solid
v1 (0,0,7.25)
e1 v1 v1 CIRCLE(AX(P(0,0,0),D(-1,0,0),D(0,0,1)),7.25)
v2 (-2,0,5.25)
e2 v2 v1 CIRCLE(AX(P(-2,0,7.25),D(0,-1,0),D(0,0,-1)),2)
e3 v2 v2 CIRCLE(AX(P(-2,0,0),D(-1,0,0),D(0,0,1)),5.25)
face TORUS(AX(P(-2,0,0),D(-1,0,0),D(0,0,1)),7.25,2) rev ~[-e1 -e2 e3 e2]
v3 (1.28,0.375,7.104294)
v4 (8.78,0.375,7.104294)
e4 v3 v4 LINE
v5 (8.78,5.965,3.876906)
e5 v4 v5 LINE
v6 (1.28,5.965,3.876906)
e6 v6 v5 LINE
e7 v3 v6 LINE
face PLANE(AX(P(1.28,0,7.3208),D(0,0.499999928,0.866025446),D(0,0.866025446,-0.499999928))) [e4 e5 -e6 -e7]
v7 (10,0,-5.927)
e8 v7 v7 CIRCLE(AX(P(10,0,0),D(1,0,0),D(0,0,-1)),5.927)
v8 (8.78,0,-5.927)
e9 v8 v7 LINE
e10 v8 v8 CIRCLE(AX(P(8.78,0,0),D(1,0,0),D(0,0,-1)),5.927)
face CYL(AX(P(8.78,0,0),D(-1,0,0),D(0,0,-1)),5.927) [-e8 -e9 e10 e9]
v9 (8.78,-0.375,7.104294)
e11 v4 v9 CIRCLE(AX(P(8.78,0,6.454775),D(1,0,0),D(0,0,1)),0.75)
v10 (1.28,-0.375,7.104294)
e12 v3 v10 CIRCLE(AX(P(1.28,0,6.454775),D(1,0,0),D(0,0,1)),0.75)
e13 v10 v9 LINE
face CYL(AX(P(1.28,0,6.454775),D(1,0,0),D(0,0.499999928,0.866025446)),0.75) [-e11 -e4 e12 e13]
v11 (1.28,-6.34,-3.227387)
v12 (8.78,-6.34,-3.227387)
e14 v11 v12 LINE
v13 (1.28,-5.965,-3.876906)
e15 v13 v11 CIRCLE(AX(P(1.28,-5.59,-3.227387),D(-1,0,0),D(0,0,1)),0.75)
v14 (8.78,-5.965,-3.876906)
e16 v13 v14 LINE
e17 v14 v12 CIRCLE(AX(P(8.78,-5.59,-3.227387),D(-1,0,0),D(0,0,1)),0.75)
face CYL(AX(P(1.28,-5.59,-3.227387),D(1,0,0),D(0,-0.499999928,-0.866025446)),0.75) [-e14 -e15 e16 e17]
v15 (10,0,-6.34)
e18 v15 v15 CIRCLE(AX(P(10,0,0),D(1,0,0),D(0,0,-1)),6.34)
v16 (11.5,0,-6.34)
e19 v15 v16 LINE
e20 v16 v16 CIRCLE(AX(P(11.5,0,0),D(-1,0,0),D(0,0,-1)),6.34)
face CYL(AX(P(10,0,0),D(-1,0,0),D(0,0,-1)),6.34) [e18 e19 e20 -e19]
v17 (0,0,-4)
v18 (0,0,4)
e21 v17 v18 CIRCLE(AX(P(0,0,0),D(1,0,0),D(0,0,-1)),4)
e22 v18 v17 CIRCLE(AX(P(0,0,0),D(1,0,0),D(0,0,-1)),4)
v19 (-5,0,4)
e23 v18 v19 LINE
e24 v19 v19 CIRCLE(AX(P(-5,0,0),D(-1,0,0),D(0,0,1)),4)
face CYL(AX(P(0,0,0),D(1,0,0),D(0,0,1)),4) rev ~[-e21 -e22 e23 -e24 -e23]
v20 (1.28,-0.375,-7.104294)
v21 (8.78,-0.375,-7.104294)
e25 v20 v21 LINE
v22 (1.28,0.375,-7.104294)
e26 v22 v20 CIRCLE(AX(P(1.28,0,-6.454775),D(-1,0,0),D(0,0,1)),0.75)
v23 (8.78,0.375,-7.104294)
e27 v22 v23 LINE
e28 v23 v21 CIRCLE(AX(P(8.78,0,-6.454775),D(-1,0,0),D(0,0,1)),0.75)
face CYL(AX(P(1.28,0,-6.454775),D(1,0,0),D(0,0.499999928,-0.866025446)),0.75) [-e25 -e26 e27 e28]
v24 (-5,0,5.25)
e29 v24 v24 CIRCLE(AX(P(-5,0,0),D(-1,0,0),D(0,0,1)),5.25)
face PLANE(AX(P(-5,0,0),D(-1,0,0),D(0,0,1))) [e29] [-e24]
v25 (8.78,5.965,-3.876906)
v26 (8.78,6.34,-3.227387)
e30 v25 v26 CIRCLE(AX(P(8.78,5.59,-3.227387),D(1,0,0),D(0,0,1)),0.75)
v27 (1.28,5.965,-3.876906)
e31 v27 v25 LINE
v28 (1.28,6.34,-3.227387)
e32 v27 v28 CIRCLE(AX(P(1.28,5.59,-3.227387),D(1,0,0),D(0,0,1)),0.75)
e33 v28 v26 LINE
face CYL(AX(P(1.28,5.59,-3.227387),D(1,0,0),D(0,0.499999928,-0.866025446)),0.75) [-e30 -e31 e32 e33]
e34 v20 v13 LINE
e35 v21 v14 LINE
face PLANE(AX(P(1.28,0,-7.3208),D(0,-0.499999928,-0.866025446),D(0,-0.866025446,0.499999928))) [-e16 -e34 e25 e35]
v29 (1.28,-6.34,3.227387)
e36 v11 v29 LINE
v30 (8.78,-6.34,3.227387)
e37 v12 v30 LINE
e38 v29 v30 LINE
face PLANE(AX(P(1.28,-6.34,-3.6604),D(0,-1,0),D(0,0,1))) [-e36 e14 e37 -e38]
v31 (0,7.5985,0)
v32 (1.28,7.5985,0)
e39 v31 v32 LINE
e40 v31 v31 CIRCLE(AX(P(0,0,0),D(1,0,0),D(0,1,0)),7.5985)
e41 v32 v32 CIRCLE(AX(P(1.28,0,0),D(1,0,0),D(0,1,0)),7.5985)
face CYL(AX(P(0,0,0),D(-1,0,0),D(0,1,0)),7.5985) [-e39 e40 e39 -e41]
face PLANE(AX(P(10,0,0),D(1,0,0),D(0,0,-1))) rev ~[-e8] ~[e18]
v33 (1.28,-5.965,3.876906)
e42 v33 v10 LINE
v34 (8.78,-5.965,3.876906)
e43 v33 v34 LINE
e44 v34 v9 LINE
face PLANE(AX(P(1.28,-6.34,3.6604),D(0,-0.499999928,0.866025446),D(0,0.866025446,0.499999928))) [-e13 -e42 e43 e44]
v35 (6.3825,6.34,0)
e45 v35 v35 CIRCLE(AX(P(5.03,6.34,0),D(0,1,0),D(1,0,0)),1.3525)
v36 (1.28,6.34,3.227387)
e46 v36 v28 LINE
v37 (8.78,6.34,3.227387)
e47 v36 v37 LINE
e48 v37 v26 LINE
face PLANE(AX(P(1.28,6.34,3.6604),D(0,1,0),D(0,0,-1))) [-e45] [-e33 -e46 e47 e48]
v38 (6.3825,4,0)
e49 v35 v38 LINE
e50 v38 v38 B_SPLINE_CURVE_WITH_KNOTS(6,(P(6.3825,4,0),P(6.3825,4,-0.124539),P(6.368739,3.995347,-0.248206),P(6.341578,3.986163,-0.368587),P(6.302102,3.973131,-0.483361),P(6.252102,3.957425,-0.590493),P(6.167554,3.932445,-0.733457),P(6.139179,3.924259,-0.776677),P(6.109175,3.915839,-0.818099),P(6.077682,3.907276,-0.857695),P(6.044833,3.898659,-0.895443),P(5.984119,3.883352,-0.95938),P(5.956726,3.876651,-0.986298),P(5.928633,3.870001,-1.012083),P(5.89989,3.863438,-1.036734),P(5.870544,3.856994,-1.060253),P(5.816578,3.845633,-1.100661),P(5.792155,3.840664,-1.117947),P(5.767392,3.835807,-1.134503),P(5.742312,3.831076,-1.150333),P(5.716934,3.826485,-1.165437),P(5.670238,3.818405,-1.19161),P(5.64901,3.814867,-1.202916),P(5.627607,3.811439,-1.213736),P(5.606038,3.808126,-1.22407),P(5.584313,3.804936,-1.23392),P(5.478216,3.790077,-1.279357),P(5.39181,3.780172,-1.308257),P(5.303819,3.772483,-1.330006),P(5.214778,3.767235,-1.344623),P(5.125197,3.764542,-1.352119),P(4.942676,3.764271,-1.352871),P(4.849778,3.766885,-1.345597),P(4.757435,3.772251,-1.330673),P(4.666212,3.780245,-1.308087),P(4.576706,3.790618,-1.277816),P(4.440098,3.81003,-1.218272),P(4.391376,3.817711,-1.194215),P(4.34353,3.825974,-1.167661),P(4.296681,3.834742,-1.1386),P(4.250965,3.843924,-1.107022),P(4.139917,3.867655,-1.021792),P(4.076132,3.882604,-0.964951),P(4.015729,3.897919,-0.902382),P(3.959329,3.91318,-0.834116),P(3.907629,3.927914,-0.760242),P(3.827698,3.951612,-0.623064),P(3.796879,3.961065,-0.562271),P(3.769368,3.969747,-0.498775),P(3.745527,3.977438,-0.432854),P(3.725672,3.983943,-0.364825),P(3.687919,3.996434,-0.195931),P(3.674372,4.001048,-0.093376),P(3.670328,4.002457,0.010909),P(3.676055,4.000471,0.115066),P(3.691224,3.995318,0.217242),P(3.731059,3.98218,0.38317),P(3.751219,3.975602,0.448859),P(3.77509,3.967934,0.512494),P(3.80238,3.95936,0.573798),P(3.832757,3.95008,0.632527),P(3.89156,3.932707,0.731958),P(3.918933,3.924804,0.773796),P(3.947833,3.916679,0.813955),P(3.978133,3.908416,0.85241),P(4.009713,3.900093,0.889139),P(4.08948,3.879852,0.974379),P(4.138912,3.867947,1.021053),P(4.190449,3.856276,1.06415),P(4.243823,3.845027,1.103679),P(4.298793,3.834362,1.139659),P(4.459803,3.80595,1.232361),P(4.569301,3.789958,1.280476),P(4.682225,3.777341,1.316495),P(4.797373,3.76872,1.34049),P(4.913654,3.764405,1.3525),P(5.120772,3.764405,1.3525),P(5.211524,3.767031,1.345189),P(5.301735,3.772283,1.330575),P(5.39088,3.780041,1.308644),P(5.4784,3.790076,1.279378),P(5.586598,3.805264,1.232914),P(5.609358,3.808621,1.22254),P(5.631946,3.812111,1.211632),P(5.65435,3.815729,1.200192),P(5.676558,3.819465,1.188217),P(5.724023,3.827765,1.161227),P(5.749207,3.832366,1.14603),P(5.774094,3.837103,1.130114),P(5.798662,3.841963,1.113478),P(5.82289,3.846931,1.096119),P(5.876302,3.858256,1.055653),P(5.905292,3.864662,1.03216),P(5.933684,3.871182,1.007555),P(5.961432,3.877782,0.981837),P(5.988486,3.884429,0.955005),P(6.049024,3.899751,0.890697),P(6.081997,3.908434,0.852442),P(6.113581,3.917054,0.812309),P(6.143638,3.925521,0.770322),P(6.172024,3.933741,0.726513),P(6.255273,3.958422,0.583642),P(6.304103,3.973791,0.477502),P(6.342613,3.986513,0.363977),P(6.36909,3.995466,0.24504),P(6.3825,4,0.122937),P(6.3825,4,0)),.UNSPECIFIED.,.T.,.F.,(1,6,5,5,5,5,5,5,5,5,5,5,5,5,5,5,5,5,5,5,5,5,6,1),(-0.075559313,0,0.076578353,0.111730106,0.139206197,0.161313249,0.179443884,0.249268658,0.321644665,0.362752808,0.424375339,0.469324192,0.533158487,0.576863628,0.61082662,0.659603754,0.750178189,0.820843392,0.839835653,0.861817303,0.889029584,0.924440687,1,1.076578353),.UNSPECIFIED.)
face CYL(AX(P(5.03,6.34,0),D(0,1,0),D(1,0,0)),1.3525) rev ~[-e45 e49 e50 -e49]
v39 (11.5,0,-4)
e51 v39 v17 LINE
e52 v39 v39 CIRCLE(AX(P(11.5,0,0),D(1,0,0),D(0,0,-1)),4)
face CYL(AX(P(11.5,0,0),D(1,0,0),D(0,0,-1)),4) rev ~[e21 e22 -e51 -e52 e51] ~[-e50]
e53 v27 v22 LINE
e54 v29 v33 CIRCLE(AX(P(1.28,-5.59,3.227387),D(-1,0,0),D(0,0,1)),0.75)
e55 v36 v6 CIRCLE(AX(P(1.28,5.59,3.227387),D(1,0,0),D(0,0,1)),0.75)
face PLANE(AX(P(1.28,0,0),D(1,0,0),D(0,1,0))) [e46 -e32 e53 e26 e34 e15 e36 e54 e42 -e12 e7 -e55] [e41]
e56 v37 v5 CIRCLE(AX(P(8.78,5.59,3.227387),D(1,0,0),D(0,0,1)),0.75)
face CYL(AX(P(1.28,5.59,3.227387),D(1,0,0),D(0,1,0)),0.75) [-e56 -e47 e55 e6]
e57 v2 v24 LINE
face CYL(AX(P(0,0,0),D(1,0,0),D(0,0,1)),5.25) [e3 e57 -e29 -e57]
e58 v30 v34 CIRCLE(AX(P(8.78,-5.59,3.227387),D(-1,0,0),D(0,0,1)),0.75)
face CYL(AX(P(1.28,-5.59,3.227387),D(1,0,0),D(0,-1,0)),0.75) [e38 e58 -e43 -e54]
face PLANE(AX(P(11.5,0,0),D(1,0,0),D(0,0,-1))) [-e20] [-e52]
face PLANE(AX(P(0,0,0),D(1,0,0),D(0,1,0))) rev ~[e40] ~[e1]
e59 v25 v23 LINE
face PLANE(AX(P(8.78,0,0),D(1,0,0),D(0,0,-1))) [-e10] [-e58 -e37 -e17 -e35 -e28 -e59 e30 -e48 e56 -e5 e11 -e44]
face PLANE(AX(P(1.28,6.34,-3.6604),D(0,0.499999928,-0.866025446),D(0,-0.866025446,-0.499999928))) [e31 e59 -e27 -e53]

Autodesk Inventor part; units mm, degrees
ref_plane "YZ Plane" through (0, 0, 0) normal (1, 0, 0) x (0, 1, 0)
ref_plane "XZ Plane" through (0, 0, 0) normal (0, 1, 0) x (-1, 0, 0)
ref_plane "XY Plane" through (0, 0, 0) normal (0, 0, 1) x (1, 0, 0)
sketch "Sketch1" plane through (0, 0, 0) normal (1, 0, 0) x (0, 1, 0)
  circle A0 centre (0, 0) radius 7.5985
  dimension "d0" = 15.197
extrude "Extrusion1" add sketch "Sketch1" along normal blind 1.28
sketch "Sketch2" plane through (1.28, 0, 0) normal (1, 0, 0) x (0, 0, -1)
  line L0 (3.6604, 6.34) -> (7.3208, 0)
  line L1 (7.3208, 0) -> (3.6604, -6.34)
  line L2 (3.6604, -6.34) -> (-3.6604, -6.34)
  line L3 (-3.6604, -6.34) -> (-7.3208, 0)
  line L4 (-7.3208, 0) -> (-3.6604, 6.34)
  line L5 (-3.6604, 6.34) -> (3.6604, 6.34)
  point P0 (0, 0)
  point P1 (0, 6.34)
  point P2 (0, 0)
extrude "Extrusion2" add sketch "Sketch2" along normal blind 7.5
sketch "Sketch3" plane through (8.78, 0, 0) normal (1, 0, 0) x (0, 0, -1)
  circle A0 centre (0, 0) radius 5.927
  dimension "d5" = 11.854
extrude "Extrusion3" add sketch "Sketch3" along normal blind 1.22
sketch "Sketch4" plane through (10, 0, 0) normal (1, 0, 0) x (0, 0, -1)
  circle A0 centre (0, 0) radius 6.34
  line L0 (3.6604, 6.34) -> (-3.6604, 6.34) projected
extrude "Extrusion4" add sketch "Sketch4" along normal blind 1.5
fillet "Fillet1" radius 0.75 5 edges at (5.03, 0, -7.3208) (5.03, -6.34, -3.6604) (5.03, 0, 7.3208) (5.03, 6.34, -3.6604) (5.03, 6.34, 3.6604)
fillet "Fillet2" radius 0.75 1 edges at (5.03, -6.34, 3.6604)
sketch "Sketch5" plane through (0, 0, 0) normal (-1, 0, 0) x (0, 0, 1)
  point P0 (0, 0)
sketch "Sketch6" plane through (1.28, 6.34, 3.2274) normal (0, 1, 0) x (1, 0, 0)
  circle A0 centre (3.75, 3.2274) radius 1.3525
  point P0 (-1.28, 3.2274)
  dimension "d12" = 2.705
extrude "Extrusion5" cut sketch "Sketch6" against normal blind 6.5
sketch "Sketch7" plane through (0, 0, 0) normal (-1, 0, 0) x (0, 0, 1)
  circle A0 centre (0, 0) radius 3.2
  dimension "d15" = 6.4
sketch "Sketch8" plane through (5.03, -0.16, 0) normal (0, 1, 0) x (1, 0, 0)
  point P0 (-5.03, 0)
extrude "Extrusion6" cut sketch "Sketch7" against normal blind 11.75
sketch "Sketch9" plane through (11.5, 0, 0) normal (1, 0, 0) x (0, 0, -1)
  circle A0 centre (0, 0) radius 4
  dimension "d18" = 8
extrude "Extrusion7" cut sketch "Sketch9" against normal blind 13.75
sketch "Sketch10" plane through (0, 0, 0) normal (-1, 0, 0) x (0, 0, 1)
  circle A0 centre (0, 0) radius 4
  circle A1 centre (0, 0) radius 5.25
  dimension "d21" = 10.5
extrude "Extrusion8" add sketch "Sketch10" along normal blind 5
fillet "Fillet3" radius 2 1 edges at (0, 0, -5.25)
properties part number "_3DPrint"
